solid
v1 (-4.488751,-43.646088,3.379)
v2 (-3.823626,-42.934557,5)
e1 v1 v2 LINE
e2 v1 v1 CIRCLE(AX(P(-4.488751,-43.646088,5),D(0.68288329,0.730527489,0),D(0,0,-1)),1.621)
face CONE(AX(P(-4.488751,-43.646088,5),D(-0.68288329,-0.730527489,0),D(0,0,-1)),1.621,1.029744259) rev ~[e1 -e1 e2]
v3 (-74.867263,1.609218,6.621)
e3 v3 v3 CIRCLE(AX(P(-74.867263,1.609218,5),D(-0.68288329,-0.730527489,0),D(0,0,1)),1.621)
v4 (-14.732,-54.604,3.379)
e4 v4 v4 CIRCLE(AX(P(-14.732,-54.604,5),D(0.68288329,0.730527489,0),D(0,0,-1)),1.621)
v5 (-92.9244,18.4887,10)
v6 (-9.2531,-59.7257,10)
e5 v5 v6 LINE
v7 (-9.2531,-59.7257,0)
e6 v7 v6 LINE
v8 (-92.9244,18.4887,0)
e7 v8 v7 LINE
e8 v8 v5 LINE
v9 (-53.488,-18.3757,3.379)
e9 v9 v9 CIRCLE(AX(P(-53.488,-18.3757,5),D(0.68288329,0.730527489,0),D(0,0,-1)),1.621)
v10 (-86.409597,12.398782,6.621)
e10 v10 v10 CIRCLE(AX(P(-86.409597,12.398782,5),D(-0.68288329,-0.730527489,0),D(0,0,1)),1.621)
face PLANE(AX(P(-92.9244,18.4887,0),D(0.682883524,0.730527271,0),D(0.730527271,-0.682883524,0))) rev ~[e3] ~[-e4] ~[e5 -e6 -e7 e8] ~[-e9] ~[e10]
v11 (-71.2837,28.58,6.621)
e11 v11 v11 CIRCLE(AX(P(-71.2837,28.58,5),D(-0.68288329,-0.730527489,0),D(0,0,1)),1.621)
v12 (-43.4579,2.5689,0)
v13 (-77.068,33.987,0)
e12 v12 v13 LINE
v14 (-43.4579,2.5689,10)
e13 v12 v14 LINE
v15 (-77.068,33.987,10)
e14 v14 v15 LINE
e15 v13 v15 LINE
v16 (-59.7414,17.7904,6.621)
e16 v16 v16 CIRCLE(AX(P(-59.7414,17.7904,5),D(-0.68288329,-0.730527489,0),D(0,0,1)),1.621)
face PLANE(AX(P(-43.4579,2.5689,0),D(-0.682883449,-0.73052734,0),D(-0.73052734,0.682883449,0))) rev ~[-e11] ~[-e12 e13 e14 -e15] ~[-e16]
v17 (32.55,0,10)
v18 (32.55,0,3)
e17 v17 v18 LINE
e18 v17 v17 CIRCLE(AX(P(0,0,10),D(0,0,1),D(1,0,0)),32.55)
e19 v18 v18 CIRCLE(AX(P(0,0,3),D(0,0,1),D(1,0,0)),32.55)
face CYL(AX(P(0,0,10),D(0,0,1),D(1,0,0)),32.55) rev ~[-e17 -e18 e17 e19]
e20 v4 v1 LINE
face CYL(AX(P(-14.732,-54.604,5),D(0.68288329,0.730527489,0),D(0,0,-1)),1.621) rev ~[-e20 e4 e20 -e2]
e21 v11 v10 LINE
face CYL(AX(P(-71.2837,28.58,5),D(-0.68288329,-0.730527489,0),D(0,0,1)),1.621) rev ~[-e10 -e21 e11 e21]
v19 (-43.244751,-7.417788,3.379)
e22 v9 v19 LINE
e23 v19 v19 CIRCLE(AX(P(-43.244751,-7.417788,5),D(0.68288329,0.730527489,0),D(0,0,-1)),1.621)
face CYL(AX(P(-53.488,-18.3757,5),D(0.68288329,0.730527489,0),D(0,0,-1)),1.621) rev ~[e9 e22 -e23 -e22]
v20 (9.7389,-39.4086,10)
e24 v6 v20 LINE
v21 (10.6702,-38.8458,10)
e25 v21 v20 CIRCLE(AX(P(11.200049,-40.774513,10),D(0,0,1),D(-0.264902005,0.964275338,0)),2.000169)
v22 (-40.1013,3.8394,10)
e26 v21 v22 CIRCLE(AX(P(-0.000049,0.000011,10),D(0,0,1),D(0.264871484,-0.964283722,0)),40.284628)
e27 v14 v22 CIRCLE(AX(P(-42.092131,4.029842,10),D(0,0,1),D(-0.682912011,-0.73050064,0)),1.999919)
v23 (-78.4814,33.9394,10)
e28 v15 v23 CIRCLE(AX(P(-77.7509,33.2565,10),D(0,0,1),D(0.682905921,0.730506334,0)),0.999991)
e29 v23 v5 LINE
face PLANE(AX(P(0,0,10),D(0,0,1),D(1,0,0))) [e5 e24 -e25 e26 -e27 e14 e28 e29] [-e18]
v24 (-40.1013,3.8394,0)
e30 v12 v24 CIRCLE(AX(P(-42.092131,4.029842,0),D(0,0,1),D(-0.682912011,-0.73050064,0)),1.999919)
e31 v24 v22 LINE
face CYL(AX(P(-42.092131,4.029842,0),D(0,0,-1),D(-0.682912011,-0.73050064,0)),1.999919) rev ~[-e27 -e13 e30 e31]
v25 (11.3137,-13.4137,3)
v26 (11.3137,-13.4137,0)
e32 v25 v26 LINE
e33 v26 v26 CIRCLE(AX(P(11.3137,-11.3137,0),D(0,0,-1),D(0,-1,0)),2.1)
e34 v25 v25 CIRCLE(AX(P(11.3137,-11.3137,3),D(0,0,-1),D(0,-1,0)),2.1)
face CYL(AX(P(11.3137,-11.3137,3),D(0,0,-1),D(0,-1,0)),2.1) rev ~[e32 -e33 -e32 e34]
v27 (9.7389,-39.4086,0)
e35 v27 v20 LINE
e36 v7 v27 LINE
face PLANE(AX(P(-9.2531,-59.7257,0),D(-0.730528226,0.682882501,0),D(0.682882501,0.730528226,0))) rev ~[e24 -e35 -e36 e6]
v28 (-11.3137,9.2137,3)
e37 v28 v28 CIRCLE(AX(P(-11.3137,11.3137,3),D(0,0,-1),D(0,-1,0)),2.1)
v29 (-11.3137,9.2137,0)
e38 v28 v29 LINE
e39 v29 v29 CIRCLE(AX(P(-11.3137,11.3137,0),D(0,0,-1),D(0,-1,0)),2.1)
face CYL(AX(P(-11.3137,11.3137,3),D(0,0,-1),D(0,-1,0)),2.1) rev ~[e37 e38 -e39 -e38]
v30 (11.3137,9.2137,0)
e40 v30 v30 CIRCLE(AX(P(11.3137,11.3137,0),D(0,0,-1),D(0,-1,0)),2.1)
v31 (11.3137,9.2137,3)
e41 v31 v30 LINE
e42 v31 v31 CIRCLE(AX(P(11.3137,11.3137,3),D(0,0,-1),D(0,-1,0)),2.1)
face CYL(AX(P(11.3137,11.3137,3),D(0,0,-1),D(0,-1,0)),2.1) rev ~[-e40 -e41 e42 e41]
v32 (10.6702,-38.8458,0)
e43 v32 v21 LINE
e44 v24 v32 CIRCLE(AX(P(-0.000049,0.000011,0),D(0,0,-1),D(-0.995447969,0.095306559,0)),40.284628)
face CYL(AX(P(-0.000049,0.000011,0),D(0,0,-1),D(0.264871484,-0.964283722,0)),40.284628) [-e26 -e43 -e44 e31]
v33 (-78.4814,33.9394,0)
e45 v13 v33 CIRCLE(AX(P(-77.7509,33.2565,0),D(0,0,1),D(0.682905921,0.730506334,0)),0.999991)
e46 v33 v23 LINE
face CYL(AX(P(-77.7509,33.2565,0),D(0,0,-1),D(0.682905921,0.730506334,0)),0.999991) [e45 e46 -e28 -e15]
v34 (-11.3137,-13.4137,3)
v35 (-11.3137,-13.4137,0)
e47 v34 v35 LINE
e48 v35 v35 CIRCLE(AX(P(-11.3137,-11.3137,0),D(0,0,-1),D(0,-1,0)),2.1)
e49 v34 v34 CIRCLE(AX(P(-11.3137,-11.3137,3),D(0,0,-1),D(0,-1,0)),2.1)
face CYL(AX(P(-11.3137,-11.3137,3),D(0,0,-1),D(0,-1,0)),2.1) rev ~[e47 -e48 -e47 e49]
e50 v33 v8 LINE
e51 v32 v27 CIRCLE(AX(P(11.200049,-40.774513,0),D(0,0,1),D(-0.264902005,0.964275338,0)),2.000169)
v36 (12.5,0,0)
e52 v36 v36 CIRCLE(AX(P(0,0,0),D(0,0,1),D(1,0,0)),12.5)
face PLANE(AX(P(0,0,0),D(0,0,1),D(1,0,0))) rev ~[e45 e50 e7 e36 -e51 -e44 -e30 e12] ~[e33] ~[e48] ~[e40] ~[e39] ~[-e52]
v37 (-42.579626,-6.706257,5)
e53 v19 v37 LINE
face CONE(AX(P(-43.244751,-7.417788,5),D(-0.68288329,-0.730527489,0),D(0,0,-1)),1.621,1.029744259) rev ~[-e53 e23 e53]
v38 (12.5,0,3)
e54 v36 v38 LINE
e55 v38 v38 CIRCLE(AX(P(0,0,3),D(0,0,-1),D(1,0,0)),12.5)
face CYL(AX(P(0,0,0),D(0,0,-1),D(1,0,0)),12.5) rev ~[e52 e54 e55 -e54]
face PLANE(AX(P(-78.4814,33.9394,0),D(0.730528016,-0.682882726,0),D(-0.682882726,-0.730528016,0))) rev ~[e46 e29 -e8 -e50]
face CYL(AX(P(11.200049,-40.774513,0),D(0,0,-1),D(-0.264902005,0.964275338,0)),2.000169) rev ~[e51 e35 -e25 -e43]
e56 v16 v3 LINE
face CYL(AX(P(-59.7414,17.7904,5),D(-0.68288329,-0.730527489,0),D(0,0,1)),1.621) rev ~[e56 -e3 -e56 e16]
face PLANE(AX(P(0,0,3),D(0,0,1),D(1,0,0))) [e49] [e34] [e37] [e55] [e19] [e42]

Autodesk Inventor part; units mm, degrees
ref_plane "YZ Plane" through (0, 0, 0) normal (1, 0, 0) x (0, 1, 0)
ref_plane "XZ Plane" through (0, 0, 0) normal (0, 1, 0) x (-1, 0, 0)
ref_plane "Work Plane1" through (0, 0, 0) normal (0, 0, 1) x (1, 0, 0)
sketch "Sketch1" plane through (0, 0, 0) normal (0, 0, 1) x (1, 0, 0)
  arc A0 (-77.068, 33.987) -> (-78.4814, 33.9394) centre (-77.7509, 33.2565) ccw projected
  line L0 (-78.4814, 33.9394) -> (-92.9244, 18.4887) projected
  line L1 (-92.9244, 18.4887) -> (-9.2531, -59.7257) projected
  line L2 (-9.2531, -59.7257) -> (9.7389, -39.4086) projected
  arc A1 (10.6702, -38.8458) -> (9.7389, -39.4086) centre (11.2, -40.7744) ccw projected
  arc A2 (10.6702, -38.8458) -> (-40.1013, 3.8394) centre (0, 0) ccw projected
  line L3 (-43.4579, 2.5689) -> (-77.068, 33.987) projected
  circle A3 centre (33.3141, 1.123) radius 2.5 projected
  circle A4 centre (1.123, -33.3141) radius 2.5 projected
  circle A5 centre (0, 0) radius 21 projected
  circle A6 centre (-1.123, 33.3141) radius 2.5 projected
  circle A7 centre (-33.3141, -1.123) radius 2.5 projected
  circle A8 centre (0, 0) radius 12.5 projected
  circle A9 centre (0, -16) radius 2 projected
  circle A10 centre (0, 16) radius 2 projected
  circle A11 centre (-16, 0) radius 2 projected
  circle A12 centre (16, 0) radius 2 projected
  circle A13 centre (11.3137, 11.3137) radius 1.6 projected
  circle A14 centre (-11.3137, -11.3137) radius 1.6 projected
  circle A15 centre (-11.3137, 11.3137) radius 1.6 projected
  circle A16 centre (11.3137, -11.3137) radius 1.6 projected
  circle A17 centre (0, 0) radius 20.7 projected
  circle A18 centre (0, 0) radius 40.2846
  line L4 (31.6375, -97.9493) -> (-99.8575, 24.9697) projected
  arc A19 (-43.4579, 2.5689) -> (-40.1013, 3.8394) centre (-42.0921, 4.03) ccw projected
  point P0 (0, 0)
  point P1 (-45.0314, -26.2807)
  point P2 (-23.1886, -46.699)
  point P3 (0, 0)
  point P4 (10.6702, -38.8458)
  point P5 (-40.1013, 3.8394)
  point P6 (0, 0)
extrude "Extrusion1" add sketch "Sketch1" along normal blind 10 contours L3 A19 A18 A1 L2 L1 L0 A0 | A2 A18 | A3 | A4 | A5 | A6 | A7 | A9 | A10 | A11 | A12 | A13 | A14 | A15 | A16 | A17
sketch "Sketch2" plane through (-77.068, 33.987, 10) normal (0.6828833, 0.7305275, 0) x (0.7305275, -0.6828833, 0)
  arc A0 (36.818, 70.5) -> (34.818, 72.5) centre (34.818, 70.5) ccw projected
  line L0 (-3.182, 72.5) -> (34.818, 72.5) projected
  arc A1 (-3.182, 72.5) -> (-5.182, 70.5) centre (-3.182, 70.5) ccw projected
  line L1 (-5.182, 2) -> (-5.182, 70.5) projected
  arc A2 (-5.182, 2) -> (-3.182, 0) centre (-3.182, 2) ccw projected
  line L2 (34.818, 0) -> (-3.182, 0) projected
  arc A3 (34.818, 0) -> (36.818, 2) centre (34.818, 2) ccw projected
  line L3 (36.818, 70.5) -> (36.818, 2) projected
  circle A4 centre (15.818, 36.25) radius 12.6 projected
  circle A5 centre (31.818, 36.25) radius 2 projected
  arc A6 (31.218, 2.9) -> (31.218, 7.1) centre (31.218, 5) ccw projected
  line L4 (0.418, 2.9) -> (31.218, 2.9) projected
  arc A7 (0.418, 7.1) -> (0.418, 2.9) centre (0.418, 5) ccw projected
  line L5 (31.218, 7.1) -> (0.418, 7.1) projected
  circle A8 centre (15.818, 20.25) radius 2 projected
  arc A9 (0.418, 69.6) -> (0.418, 65.4) centre (0.418, 67.5) ccw projected
  line L6 (31.218, 69.6) -> (0.418, 69.6) projected
  arc A10 (31.218, 65.4) -> (31.218, 69.6) centre (31.218, 67.5) ccw projected
  line L7 (0.418, 65.4) -> (31.218, 65.4) projected
  circle A11 centre (15.818, 52.25) radius 2 projected
  circle A12 centre (-0.182, 36.25) radius 2 projected
  circle A13 centre (7.918, 67.5) radius 1.5706 projected
  circle A14 centre (23.718, 67.5) radius 1.5706 projected
  circle A15 centre (28.5459, 23.5221) radius 2 projected
  circle A16 centre (3.09, 23.5221) radius 2 projected
  circle A17 centre (3.09, 48.9779) radius 2 projected
  circle A18 centre (28.5459, 48.9779) radius 2 projected
  point P0 (79.5095, 10)
  point P1 (7.918, 5)
  point P2 (23.718, 5)
hole "Hole1" at (-71.2837, 28.58, 5) at (-59.7414, 17.7904, 5) direction (-0.6828833, -0.7305275, 0) diameter 3.242 end through all thread size "M4x0.7" class "6H" standard "ISO Metric profile"
sketch "Sketch9" plane through (0, 0, 10) normal (0, 0, 1) x (1, 0, 0)
  circle A0 centre (0, 0) radius 32.55
  dimension "d44" = 65.1
extrude "Extrusion4" cut sketch "Sketch9" against normal blind 7
sketch "Sketch11" plane through (-9.2531, -59.7257, 0) normal (-0.6828833, -0.7305275, 0) x (0.7305275, -0.6828833, 0)
  circle A0 centre (-60.5521, 5) radius 2.25 projected
  circle A1 centre (-7.5, 5) radius 2.25 projected
  point P0 (-34.026, 0)
hole "Hole7" at (-53.488, -18.3757, 5) at (-14.732, -54.604, 5) direction (0.6828833, 0.7305275, 0) diameter 3.242 depth 15 tip angle 118 thread size "M4x0.7" class "6H" standard "ISO Metric profile"
sketch "Sketch12" plane through (0, 0, 3) normal (0, 0, 1) x (1, 0, 0)
  circle A0 centre (0, 0) radius 12.5 projected
  circle A1 centre (0, -18) radius 2 projected
  circle A2 centre (0, 18) radius 2 projected
  circle A3 centre (-18, 0) radius 2 projected
  circle A4 centre (18, 0) radius 2 projected
  circle A5 centre (11.3137, 11.3137) radius 1.6 projected
  circle A6 centre (-11.3137, -11.3137) radius 1.6 projected
  circle A7 centre (-11.3137, 11.3137) radius 1.6 projected
  circle A8 centre (11.3137, -11.3137) radius 1.6 projected
  circle A9 centre (0, 0) radius 20.7 projected
  point P0 (0, 0)
hole "Hole8" at (11.3137, 11.3137, 3) at (-11.3137, 11.3137, 3) at (-11.3137, -11.3137, 3) at (11.3137, -11.3137, 3) direction (0, 0, -1) diameter 4.2 depth 12.8 tip angle 118 clearance for "Countersunk Flat Head Screw ISO 2009/7046" size "M4" standard "ISO"
properties part number "gearboxframv2" material "Aluminum 6061"
